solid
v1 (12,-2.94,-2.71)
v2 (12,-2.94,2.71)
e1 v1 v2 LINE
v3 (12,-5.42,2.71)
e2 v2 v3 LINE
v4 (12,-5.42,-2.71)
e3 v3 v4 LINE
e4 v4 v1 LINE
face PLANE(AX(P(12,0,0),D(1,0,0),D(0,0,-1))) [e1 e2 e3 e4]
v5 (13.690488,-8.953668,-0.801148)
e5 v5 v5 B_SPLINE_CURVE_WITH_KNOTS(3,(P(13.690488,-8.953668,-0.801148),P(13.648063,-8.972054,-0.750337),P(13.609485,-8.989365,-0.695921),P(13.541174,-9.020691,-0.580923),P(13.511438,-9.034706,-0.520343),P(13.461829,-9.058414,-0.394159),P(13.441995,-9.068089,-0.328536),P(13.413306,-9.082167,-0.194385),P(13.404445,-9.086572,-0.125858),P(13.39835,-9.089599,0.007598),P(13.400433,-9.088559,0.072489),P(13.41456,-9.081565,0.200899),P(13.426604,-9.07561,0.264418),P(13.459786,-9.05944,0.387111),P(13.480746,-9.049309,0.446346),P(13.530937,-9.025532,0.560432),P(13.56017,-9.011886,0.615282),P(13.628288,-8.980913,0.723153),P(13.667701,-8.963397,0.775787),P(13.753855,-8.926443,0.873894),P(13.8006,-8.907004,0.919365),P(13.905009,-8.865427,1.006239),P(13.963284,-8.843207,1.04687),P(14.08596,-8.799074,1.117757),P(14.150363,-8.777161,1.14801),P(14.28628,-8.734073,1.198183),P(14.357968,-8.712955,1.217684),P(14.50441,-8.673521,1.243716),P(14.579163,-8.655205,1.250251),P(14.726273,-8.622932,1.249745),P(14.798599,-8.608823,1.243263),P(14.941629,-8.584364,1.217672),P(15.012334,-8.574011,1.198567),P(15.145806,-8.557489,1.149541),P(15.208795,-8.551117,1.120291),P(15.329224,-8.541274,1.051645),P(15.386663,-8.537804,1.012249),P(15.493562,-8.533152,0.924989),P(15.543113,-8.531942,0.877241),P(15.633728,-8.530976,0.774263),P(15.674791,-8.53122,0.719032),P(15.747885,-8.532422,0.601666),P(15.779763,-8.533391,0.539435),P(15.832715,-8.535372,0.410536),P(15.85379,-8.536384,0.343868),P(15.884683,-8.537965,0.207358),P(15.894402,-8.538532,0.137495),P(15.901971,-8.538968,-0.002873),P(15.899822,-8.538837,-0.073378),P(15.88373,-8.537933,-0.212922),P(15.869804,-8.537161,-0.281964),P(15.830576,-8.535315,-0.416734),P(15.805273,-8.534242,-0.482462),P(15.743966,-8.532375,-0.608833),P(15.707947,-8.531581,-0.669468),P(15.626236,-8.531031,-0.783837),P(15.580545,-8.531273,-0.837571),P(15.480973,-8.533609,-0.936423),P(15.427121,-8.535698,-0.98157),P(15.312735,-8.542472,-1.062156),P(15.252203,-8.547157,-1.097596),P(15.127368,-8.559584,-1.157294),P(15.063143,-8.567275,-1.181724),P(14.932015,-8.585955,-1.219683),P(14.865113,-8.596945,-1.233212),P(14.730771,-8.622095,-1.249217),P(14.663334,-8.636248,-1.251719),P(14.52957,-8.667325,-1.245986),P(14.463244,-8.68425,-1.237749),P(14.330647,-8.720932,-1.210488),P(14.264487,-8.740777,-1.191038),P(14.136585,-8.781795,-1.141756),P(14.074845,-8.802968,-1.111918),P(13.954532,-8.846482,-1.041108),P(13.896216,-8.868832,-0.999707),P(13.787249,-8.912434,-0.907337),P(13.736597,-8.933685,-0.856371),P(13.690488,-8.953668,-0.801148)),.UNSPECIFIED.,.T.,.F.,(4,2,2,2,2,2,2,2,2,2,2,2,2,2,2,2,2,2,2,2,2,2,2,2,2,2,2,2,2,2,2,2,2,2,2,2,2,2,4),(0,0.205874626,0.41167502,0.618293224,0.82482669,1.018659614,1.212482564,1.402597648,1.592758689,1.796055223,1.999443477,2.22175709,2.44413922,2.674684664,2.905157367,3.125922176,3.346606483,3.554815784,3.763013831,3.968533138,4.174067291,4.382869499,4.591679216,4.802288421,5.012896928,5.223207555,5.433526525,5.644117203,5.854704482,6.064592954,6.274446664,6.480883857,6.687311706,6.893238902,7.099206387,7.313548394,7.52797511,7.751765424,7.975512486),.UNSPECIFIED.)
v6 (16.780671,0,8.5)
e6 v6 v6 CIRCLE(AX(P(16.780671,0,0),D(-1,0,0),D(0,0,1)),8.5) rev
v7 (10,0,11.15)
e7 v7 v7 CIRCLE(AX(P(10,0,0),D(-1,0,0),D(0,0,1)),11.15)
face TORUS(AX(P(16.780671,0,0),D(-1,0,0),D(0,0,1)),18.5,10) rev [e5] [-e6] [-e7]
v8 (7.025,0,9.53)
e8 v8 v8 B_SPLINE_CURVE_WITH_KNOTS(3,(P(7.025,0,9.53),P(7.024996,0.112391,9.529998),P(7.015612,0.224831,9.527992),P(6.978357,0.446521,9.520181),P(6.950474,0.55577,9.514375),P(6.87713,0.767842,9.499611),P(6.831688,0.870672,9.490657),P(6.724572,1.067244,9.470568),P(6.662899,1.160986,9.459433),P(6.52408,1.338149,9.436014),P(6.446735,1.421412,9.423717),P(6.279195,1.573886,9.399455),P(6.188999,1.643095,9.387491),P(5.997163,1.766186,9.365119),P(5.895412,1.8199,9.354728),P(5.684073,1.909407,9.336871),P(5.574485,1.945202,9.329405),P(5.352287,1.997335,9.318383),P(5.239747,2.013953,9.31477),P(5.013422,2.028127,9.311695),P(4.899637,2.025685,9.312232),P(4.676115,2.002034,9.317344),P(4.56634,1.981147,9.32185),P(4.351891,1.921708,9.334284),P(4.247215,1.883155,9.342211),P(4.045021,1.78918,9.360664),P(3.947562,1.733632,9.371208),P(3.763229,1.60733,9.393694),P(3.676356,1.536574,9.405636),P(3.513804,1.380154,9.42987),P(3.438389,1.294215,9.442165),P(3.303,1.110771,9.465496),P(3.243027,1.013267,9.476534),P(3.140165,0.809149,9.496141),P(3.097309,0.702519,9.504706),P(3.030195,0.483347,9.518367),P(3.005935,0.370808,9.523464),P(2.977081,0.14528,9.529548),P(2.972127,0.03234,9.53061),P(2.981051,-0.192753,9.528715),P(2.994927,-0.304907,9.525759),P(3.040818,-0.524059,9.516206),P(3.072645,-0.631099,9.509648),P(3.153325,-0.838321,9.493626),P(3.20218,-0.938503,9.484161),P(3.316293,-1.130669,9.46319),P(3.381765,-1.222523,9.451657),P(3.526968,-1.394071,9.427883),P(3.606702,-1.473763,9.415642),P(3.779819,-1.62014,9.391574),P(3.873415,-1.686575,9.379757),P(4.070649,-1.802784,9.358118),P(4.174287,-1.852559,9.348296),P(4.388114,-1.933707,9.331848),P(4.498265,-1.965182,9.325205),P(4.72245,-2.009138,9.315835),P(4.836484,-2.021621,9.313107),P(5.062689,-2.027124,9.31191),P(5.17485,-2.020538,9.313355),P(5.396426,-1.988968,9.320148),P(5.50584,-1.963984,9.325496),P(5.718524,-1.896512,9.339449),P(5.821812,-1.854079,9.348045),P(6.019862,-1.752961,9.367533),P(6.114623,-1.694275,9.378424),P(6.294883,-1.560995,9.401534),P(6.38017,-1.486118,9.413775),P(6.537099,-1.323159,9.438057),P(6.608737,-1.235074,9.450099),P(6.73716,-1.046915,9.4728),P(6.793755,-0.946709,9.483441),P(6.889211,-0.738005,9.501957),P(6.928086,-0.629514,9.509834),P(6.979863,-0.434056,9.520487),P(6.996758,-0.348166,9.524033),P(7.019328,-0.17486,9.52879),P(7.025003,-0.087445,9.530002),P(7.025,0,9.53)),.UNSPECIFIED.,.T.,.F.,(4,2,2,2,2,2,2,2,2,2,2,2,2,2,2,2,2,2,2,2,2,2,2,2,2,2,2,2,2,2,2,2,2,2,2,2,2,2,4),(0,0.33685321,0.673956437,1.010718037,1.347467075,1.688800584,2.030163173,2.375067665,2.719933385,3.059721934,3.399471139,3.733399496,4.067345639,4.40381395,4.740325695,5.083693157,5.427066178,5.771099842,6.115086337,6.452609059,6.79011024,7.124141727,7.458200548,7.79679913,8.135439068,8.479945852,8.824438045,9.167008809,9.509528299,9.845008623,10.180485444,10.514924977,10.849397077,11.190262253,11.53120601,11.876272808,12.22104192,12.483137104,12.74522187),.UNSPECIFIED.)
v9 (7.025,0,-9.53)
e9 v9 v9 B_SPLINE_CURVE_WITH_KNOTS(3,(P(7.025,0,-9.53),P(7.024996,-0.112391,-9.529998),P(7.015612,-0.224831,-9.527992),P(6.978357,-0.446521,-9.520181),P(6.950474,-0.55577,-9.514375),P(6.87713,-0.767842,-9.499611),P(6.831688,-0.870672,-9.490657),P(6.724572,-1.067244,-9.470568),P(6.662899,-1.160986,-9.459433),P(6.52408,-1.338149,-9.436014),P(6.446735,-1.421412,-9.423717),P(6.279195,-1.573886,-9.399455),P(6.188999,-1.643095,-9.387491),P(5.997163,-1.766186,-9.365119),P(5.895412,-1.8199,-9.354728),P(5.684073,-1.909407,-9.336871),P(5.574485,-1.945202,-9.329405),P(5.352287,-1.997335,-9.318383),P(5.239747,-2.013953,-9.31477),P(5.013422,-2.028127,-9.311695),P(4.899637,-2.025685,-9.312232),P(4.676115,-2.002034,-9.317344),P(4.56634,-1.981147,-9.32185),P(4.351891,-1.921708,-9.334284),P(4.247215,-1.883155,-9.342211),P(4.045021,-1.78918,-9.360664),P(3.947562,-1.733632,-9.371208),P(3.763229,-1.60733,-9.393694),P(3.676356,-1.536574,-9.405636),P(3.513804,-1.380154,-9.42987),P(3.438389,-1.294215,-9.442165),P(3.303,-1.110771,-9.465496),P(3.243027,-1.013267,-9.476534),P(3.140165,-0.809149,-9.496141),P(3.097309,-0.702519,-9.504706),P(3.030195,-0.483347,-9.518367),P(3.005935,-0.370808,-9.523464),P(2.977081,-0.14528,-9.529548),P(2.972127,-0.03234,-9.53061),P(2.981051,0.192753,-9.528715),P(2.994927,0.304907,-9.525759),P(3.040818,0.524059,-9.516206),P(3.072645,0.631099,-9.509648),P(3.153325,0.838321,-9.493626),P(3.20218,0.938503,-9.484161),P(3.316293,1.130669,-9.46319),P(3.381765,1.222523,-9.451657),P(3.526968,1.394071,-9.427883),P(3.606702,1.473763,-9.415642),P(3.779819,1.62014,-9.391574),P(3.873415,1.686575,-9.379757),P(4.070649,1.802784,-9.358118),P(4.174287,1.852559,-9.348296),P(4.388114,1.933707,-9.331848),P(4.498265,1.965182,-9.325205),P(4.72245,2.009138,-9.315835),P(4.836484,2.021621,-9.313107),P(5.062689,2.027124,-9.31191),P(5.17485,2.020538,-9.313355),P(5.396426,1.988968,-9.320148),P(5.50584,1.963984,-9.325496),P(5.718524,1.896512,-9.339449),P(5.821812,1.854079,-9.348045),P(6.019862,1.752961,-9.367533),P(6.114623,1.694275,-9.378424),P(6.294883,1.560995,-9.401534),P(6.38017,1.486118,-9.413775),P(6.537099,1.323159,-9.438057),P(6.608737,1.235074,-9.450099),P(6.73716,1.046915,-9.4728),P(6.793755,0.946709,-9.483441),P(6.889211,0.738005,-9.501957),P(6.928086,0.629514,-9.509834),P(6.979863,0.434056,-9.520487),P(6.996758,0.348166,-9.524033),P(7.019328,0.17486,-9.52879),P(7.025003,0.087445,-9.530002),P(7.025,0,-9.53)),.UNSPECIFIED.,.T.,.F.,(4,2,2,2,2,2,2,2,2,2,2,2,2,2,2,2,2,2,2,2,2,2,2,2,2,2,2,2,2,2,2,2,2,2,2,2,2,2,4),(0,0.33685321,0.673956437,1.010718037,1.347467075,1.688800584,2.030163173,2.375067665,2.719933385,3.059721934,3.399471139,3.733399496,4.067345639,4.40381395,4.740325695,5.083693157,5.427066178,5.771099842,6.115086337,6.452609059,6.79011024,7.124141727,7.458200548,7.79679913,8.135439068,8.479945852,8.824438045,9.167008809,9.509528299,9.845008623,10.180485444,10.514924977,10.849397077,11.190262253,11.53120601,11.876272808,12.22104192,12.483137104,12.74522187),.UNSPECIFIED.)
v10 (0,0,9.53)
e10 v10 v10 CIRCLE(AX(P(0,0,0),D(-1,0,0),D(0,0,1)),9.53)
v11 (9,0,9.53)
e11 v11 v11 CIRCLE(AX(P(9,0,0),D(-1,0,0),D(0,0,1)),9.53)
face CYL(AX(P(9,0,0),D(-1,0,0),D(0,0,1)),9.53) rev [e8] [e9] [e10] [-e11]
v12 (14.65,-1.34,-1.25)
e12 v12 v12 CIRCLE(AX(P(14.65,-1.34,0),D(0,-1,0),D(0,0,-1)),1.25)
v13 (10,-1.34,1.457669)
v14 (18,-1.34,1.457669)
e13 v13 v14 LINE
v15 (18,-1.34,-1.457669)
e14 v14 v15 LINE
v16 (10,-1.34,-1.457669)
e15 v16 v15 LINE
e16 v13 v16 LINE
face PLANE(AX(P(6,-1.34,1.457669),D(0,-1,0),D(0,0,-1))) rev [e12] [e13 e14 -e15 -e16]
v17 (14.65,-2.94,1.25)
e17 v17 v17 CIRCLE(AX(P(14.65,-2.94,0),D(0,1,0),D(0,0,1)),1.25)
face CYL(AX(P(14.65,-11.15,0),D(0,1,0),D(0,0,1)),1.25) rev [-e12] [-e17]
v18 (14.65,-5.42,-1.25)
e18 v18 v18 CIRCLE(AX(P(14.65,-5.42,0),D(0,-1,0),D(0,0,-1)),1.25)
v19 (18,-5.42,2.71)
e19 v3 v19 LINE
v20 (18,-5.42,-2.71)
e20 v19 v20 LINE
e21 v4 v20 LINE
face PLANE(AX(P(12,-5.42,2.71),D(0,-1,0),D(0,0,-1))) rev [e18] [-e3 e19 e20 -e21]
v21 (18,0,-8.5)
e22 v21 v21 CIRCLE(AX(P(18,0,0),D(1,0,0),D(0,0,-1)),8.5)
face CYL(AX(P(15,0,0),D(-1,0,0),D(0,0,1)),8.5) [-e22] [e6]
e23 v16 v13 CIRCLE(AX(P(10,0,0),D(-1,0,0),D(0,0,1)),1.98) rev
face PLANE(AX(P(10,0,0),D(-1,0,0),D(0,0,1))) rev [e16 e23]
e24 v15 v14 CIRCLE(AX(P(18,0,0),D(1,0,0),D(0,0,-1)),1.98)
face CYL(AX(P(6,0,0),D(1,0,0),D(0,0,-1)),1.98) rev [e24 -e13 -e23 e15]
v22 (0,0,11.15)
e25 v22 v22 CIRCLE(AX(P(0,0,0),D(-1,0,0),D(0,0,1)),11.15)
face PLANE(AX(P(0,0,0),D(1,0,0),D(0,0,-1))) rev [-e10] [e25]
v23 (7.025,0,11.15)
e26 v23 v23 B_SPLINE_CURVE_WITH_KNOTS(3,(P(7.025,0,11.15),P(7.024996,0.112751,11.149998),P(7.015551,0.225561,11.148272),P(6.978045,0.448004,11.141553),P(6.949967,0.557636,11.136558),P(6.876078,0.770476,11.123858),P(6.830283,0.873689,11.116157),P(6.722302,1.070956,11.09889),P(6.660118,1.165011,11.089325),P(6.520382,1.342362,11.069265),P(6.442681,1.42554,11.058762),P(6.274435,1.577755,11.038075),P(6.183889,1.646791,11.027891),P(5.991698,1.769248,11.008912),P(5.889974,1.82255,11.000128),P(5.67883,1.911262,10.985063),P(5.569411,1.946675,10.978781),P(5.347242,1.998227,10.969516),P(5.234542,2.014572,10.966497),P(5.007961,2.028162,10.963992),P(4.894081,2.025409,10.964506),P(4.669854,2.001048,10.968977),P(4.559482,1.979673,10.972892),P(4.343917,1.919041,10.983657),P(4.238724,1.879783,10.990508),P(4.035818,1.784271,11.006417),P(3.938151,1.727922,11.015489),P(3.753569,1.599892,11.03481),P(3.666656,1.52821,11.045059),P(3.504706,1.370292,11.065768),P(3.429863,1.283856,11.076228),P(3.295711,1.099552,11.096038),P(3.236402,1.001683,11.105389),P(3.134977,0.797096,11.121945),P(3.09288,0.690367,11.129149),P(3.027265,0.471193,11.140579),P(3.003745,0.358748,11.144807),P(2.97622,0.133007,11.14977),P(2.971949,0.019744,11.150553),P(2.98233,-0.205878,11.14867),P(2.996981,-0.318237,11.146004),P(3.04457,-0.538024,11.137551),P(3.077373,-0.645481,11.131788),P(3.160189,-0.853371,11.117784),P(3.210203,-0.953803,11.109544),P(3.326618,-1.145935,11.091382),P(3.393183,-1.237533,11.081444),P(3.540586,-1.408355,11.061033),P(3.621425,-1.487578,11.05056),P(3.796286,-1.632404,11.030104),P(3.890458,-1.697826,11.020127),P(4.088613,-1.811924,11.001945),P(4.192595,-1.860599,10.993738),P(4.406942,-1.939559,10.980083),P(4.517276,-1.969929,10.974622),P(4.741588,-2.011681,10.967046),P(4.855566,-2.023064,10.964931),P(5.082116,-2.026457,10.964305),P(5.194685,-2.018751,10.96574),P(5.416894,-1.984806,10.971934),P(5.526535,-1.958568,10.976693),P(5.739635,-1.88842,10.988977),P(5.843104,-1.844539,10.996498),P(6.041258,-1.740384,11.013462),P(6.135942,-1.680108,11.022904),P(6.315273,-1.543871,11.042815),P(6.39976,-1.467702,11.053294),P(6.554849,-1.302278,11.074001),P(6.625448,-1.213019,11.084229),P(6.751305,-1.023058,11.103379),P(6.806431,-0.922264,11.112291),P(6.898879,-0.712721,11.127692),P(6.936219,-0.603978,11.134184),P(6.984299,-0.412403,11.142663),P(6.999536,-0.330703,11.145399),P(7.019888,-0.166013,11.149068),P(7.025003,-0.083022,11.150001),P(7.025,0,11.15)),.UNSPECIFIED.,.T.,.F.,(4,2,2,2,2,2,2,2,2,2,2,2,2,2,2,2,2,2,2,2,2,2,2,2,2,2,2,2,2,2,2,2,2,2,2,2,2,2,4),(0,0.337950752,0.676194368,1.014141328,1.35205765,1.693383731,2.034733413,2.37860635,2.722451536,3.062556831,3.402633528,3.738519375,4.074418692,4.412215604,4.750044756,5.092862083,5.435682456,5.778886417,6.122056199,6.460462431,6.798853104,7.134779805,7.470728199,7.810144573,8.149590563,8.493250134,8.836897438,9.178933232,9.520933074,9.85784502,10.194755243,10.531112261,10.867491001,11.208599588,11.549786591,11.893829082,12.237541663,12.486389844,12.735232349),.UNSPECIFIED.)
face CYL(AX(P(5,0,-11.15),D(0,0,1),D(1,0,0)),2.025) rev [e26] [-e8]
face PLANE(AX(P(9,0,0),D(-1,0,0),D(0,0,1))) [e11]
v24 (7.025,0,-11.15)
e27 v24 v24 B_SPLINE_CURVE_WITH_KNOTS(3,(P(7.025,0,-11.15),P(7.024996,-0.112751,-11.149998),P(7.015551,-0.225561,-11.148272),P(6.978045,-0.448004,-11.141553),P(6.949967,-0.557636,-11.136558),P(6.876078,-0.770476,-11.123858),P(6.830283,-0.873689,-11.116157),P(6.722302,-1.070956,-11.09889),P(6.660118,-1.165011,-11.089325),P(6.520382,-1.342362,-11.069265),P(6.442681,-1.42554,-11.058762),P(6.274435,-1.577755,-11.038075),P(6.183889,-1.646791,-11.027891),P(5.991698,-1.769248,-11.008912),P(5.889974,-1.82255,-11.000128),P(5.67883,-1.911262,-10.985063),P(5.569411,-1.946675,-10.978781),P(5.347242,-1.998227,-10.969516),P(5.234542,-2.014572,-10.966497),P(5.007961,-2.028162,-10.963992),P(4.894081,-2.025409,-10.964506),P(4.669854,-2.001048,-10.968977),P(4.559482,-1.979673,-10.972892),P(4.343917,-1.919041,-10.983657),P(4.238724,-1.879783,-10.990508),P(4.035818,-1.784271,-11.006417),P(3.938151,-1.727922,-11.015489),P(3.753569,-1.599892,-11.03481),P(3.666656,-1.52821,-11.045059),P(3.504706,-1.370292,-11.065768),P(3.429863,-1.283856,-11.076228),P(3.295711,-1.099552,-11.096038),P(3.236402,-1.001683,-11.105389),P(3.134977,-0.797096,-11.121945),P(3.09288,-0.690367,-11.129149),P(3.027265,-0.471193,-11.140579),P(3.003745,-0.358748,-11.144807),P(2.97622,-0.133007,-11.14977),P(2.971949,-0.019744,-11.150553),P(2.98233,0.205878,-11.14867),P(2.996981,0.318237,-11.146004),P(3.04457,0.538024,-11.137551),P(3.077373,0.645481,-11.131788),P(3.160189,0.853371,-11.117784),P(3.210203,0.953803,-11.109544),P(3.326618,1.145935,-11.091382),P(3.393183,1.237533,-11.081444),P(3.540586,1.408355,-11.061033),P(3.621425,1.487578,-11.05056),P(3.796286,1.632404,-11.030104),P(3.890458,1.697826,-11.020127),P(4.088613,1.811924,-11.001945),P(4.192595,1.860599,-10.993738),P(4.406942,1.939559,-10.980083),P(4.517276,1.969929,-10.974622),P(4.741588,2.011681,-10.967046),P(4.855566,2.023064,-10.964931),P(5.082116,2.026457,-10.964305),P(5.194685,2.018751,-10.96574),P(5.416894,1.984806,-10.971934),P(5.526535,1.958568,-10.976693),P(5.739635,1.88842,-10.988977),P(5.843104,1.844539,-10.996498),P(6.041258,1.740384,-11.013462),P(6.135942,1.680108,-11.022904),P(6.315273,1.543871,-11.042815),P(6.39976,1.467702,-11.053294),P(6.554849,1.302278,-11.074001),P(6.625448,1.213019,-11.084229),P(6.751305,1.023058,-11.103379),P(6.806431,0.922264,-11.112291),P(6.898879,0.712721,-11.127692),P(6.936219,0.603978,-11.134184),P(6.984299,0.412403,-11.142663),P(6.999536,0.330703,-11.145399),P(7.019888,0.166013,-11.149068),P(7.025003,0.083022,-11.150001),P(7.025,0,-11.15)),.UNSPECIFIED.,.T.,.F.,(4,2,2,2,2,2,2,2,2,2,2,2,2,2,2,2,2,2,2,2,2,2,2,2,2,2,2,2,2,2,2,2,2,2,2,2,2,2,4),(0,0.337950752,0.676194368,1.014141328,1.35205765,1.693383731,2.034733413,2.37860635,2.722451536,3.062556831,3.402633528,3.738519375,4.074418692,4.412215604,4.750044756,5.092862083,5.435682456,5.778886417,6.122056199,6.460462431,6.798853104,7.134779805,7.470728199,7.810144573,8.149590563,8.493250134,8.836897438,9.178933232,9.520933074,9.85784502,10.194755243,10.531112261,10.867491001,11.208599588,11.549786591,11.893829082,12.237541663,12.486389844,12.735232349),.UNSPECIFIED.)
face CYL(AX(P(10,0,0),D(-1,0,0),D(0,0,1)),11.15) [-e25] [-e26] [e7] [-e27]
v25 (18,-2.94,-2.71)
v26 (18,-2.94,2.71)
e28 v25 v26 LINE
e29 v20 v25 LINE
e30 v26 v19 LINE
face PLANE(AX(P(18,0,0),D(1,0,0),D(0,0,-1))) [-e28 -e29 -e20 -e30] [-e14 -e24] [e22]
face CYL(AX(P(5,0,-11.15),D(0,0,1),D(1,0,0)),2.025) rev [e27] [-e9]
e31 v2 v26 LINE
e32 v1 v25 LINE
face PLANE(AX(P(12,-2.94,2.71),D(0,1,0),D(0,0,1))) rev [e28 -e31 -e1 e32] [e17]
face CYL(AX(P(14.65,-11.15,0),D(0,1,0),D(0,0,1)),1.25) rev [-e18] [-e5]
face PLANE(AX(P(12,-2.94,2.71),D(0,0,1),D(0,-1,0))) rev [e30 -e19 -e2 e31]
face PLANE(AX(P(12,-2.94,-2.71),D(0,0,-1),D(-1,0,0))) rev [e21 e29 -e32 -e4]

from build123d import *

# Parameters (mm, degrees)
CROQUIS1_R                 = 8.5
SALIENTE_EXTRUIR1_DEPTH    = 15
CORTAR_EXTRUIR1_DEPTH      = 9
CROQUIS9_R                 = 11.15
SALIENTE_EXTRUIR5_DEPTH    = 10
CROQUIS3_R                 = 9.53
CORTAR_EXTRUIR2_DEPTH      = 9
CORTAR_EXTRUIR4_DEPTH      = 22.763386685
CORTAR_EXTRUIR4_DEPTH_BACK = 22.763386685
CROQUIS5_R                 = 2.025
CROQUIS7_R                 = 8.5
SALIENTE_EXTRUIR3_DEPTH    = 3
CROQUIS10_W                = 5.42
CROQUIS10_H                = 2.48
CORTAR_EXTRUIR5_DEPTH      = 6
CROQUIS12_R                = 1.25
CORTAR_EXTRUIR6_DEPTH      = 24.930002183


with BuildPart() as part:
    # Croquis1 → Saliente-Extruir1 (new body)
    with BuildSketch(Plane(origin=(0, 0, 0), x_dir=(0, 0, -1), z_dir=(1, 0, 0))):
        Circle(CROQUIS1_R)
    extrude(amount=SALIENTE_EXTRUIR1_DEPTH)

    # Croquis2 → Cortar-Extruir1 (cut)
    with BuildSketch(Plane(origin=(15, 0, 0), x_dir=(0, 0, -1), z_dir=(1, 0, 0))):
        with BuildLine():
            Line((-1.457669373, -1.34), (1.457669373, -1.34))
            ThreePointArc((1.457669373, -1.34), (0, 1.98), (-1.457669373, -1.34))
        make_face()
    extrude(amount=-CORTAR_EXTRUIR1_DEPTH, mode=Mode.SUBTRACT)

    # Croquis9 → Saliente-Extruir5 (add)
    with BuildSketch(Plane.ZY):
        Circle(CROQUIS9_R)
    extrude(amount=-SALIENTE_EXTRUIR5_DEPTH)

    # Croquis3 → Cortar-Extruir2 (cut)
    with BuildSketch(Plane.ZY):
        Circle(CROQUIS3_R)
    extrude(amount=-CORTAR_EXTRUIR2_DEPTH, mode=Mode.SUBTRACT)

    # Croquis5 → Cortar-Extruir4 (cut, two sides: drawn at the far end of the back side and taken through both)
    with BuildSketch(Plane.XY.offset(-CORTAR_EXTRUIR4_DEPTH_BACK)):
        with Locations((5, 0)):
            Circle(CROQUIS5_R)
    extrude(amount=CORTAR_EXTRUIR4_DEPTH + CORTAR_EXTRUIR4_DEPTH_BACK, mode=Mode.SUBTRACT)

    # Croquis7 → Saliente-Extruir3 (add)
    with BuildSketch(Plane(origin=(15, 0, 0), x_dir=(0, 0, -1), z_dir=(1, 0, 0))):
        with Locations(Location((0, 0, 0), (0, 0, 180))):
            Circle(CROQUIS7_R)
        with BuildLine():
            Line((-1.457669373, -1.34), (1.457669373, -1.34))
            ThreePointArc((1.457669373, -1.34), (0, 1.98), (-1.457669373, -1.34))
        make_face(mode=Mode.SUBTRACT)
    extrude(amount=SALIENTE_EXTRUIR3_DEPTH)

    # Redondeo1: read off the stored shape, not the designer's step
    # Redondeo1 outline → Redondeo1 (revolve)
    with BuildSketch(Plane.YX):
        with BuildLine():
            Line((8.5, 10), (11.15, 10))
            ThreePointArc((11.15, 10), (9.186031995, 13.140616114), (8.5, 16.780671058))
            Line((8.5, 16.780671058), (8.5, 10))
        make_face()
    revolve(axis=Axis((0, 0, 0), (1, 0, 0)))

    # Croquis10 → Cortar-Extruir5 (cut)
    with BuildSketch(Plane(origin=(18, 0, 0), x_dir=(0, 0, -1), z_dir=(1, 0, 0))):
        with Locations((0, -4.18)):
            Rectangle(CROQUIS10_W, CROQUIS10_H)
    extrude(amount=-CORTAR_EXTRUIR5_DEPTH, mode=Mode.SUBTRACT)

    # Croquis12 → Cortar-Extruir6 (cut, through all)
    with BuildSketch(Plane(origin=(0, 0, 0), x_dir=(1, 0, 0), z_dir=(0, 1, 0))):
        with Locations(Location((14.65, 0, 0), (0, 0, 140.139668223))):
            Circle(CROQUIS12_R)
    extrude(amount=-CORTAR_EXTRUIR6_DEPTH, mode=Mode.SUBTRACT)


solid = part.part
